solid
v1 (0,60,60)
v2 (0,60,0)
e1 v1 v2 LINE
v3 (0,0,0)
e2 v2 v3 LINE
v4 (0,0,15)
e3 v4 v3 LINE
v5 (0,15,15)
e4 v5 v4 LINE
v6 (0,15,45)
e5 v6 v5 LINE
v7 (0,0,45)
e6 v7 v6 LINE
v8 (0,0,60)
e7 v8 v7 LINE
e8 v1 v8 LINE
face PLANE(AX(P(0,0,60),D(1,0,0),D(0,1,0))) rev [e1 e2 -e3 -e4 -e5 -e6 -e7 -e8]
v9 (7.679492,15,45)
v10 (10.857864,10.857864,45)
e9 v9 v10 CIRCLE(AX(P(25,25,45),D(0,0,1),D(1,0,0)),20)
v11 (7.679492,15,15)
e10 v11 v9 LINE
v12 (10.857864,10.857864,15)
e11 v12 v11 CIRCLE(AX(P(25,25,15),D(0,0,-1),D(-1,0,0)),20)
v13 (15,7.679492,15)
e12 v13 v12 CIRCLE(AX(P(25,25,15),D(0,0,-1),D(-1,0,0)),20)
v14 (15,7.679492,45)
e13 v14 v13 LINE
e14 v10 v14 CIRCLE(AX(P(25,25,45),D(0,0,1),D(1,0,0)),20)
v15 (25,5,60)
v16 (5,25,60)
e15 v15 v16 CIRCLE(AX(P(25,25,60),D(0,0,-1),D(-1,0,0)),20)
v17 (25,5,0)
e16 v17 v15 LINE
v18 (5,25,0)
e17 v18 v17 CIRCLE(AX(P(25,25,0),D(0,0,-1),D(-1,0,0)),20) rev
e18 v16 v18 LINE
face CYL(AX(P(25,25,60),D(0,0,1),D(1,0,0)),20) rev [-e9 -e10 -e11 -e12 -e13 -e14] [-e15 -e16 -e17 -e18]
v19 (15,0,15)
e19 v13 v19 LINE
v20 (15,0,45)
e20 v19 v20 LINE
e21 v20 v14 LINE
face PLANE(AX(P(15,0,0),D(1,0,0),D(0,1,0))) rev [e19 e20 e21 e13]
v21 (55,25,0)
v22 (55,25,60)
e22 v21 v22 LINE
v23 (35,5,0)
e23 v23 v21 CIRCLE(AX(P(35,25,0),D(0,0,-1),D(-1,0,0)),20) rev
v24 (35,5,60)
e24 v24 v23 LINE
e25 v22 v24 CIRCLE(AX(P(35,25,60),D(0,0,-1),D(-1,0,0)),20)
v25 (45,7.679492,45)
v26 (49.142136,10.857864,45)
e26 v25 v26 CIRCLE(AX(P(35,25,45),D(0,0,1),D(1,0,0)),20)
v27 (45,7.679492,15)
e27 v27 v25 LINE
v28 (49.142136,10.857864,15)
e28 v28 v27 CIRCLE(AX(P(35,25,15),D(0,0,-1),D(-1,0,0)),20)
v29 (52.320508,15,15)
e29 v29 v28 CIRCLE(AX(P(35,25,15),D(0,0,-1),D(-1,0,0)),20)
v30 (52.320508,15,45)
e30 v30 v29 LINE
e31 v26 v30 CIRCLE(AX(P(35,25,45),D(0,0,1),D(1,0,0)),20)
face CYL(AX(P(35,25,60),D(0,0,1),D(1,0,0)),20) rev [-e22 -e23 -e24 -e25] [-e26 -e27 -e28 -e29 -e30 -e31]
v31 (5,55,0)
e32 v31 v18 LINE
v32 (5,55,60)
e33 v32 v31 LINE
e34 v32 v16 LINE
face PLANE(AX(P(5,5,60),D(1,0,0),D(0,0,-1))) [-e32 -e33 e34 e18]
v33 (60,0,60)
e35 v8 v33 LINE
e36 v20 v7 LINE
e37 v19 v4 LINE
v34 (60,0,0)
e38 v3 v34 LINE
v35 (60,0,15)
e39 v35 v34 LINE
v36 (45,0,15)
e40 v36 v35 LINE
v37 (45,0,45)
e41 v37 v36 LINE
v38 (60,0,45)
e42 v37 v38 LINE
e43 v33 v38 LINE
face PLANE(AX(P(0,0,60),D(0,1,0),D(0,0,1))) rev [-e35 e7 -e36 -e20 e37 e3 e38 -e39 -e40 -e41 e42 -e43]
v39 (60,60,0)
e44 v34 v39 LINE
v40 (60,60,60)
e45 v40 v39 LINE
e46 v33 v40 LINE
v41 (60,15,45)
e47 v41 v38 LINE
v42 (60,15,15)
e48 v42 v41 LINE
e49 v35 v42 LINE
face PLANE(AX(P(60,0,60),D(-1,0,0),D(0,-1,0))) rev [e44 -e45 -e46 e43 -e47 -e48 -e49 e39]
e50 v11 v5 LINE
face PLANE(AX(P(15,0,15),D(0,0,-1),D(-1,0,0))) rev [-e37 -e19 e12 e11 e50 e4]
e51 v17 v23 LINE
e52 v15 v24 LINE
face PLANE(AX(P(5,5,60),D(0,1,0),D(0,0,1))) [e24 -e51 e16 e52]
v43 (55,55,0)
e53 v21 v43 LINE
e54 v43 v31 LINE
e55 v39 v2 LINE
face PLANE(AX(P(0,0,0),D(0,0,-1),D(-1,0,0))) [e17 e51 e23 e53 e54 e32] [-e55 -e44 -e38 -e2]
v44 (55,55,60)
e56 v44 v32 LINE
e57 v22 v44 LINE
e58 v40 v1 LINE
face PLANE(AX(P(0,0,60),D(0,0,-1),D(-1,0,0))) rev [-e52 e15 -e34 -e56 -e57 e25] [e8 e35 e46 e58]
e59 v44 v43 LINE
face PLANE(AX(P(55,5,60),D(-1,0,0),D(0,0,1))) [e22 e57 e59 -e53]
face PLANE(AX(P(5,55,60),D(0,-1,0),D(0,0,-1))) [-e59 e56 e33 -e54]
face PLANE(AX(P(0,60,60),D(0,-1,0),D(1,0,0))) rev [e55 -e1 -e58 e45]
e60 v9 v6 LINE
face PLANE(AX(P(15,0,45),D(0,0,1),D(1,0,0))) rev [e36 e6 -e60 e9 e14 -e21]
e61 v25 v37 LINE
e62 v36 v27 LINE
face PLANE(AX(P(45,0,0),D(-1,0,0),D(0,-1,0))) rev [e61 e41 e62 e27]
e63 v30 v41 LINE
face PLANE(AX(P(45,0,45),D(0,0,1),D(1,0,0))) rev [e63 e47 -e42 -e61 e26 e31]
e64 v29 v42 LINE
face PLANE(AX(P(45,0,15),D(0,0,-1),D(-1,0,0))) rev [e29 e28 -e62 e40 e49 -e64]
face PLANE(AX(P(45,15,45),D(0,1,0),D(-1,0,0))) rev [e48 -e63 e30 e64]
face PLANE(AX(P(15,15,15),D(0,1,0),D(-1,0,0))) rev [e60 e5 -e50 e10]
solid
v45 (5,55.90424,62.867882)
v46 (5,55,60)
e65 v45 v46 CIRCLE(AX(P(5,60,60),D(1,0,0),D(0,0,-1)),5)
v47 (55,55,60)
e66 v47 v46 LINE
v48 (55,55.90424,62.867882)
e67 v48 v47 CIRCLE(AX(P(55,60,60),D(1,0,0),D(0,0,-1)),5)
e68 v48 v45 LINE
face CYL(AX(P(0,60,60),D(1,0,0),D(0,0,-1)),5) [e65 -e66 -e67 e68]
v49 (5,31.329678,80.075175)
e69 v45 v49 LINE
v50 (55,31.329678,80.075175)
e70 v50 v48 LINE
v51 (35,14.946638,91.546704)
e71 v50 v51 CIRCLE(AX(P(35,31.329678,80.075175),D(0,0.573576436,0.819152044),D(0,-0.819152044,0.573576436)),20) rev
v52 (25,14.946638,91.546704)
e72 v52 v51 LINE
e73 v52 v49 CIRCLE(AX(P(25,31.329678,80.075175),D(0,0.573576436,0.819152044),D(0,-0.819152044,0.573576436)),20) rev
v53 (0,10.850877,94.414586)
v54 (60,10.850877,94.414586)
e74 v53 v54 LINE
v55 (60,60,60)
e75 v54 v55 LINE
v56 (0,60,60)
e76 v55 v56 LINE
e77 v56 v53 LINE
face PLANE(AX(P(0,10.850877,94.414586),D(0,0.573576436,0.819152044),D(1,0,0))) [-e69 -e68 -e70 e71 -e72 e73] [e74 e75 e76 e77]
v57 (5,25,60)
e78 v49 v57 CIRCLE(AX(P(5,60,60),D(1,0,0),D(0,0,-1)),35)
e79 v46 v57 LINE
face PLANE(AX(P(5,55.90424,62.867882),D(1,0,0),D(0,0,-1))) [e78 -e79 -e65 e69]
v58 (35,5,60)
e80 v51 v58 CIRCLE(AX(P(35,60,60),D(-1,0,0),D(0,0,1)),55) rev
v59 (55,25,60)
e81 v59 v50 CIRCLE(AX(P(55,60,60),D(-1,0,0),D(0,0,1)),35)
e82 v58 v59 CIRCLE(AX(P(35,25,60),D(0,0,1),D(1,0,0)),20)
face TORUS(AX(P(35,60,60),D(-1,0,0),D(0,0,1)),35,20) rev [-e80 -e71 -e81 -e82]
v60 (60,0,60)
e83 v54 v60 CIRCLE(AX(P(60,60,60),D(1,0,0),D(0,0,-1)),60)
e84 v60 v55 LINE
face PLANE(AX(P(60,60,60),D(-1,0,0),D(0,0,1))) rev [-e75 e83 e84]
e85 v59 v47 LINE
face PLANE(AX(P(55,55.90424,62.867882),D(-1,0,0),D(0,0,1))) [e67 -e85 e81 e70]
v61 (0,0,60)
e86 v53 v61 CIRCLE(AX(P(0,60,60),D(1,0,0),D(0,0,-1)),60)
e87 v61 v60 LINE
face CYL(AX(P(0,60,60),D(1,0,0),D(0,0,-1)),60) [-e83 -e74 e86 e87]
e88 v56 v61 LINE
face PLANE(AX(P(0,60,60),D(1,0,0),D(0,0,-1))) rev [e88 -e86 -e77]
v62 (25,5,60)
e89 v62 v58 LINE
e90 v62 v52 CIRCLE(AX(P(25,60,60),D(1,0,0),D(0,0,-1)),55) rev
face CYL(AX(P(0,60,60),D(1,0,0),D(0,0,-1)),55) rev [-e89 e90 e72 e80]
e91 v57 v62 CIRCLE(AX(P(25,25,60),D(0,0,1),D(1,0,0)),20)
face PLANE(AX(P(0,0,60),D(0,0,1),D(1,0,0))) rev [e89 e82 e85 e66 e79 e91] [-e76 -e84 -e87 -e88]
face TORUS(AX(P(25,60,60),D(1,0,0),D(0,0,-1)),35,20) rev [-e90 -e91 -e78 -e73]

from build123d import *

# Parameters (mm, degrees)
ESQUISSE1_W             = 60
ESQUISSE1_H             = 60
ESQUISSE1_W_2           = 50
ESQUISSE1_H_2           = 50
BOSS_EXTRU_3_DEPTH      = 60
ESQUISSE10_W            = 60
ESQUISSE10_H            = 60
ESQUISSE10_W_2          = 50
ESQUISSE10_H_2          = 50
R_VOLUTION1_ANGLE       = 35
ESQUISSE11_W            = 30
ESQUISSE11_H            = 15
ENL_V_MAT_EXTRU_3_DEPTH = 15
ESQUISSE12_W            = 30
ESQUISSE12_H            = 15
ENL_V_MAT_EXTRU_4_DEPTH = 15
CONG_1_DEPTH            = 15
CONG_1_START            = 45
CONG_1_2_DEPTH          = 15
CONG_1_START_2          = 15
CONG_1_3_DEPTH          = 30
CONG_3_R                = 20
CONG_4_R                = 20
CONG_5_DEPTH            = 15
CONG_5_START            = 45
CONG_5_2_DEPTH          = 15
CONG_5_START_2          = 15
CONG_5_3_DEPTH          = 30


with BuildPart() as part:
    # Esquisse1 → Boss.-Extru.3 (new body)
    with BuildSketch(Plane.XY):
        with Locations((30, 30)):
            Rectangle(ESQUISSE1_W, ESQUISSE1_H)
        with Locations((30, 30)):
            Rectangle(ESQUISSE1_W_2, ESQUISSE1_H_2, mode=Mode.SUBTRACT)
    extrude(amount=BOSS_EXTRU_3_DEPTH)

    # Esquisse11 → Enlèv. mat.-Extru.3 (cut)
    with BuildSketch(Plane.ZY):
        with Locations((30, 7.5)):
            Rectangle(ESQUISSE11_W, ESQUISSE11_H)
    extrude(amount=-ENL_V_MAT_EXTRU_3_DEPTH, mode=Mode.SUBTRACT)

    # Esquisse12 → Enlèv. mat.-Extru.4 (cut)
    with BuildSketch(Plane(origin=(60, 0, 0), x_dir=(0, 0, -1), z_dir=(1, 0, 0))):
        with Locations((-30, 7.5)):
            Rectangle(ESQUISSE12_W, ESQUISSE12_H)
    extrude(amount=-ENL_V_MAT_EXTRU_4_DEPTH, mode=Mode.SUBTRACT)

    # Congé1: read off the stored shape, not the designer's step
    # Congé1 outline → Congé1 (add)
    with BuildSketch(Plane.XY):
        with BuildLine():
            Line((55, 5), (55, 25))
            ThreePointArc((55, 25), (49.142135624, 10.857864376), (35, 5))
            Line((35, 5), (55, 5))
        make_face()
    extrude(amount=CONG_1_DEPTH)

    # Cong_1 2 outline → Cong_1 2 (add)
    with BuildSketch(Plane.XY.offset(CONG_1_START)):
        with BuildLine():
            Line((55, 5), (55, 25))
            ThreePointArc((55, 25), (49.142135624, 10.857864376), (35, 5))
            Line((35, 5), (55, 5))
        make_face()
    extrude(amount=CONG_1_2_DEPTH)

    # Cong_1 3 outline → Cong_1 3 (add)
    with BuildSketch(Plane.XY.offset(CONG_1_START_2)):
        with BuildLine():
            Line((52.320508076, 15), (55, 15))
            Line((55, 15), (55, 25))
            ThreePointArc((55, 25), (54.318516526, 19.823619098), (52.320508076, 15))
        make_face()
        with BuildLine():
            Line((45, 5), (45, 7.679491924))
            ThreePointArc((45, 7.679491924), (40.176380902, 5.681483474), (35, 5))
            Line((35, 5), (45, 5))
        make_face()
    extrude(amount=CONG_1_3_DEPTH)

    # Congé5: read off the stored shape, not the designer's step
    # Congé5 outline → Congé5 (add)
    with BuildSketch(Plane.XY):
        with BuildLine():
            Line((5, 25), (5, 5))
            Line((5, 5), (25, 5))
            ThreePointArc((25, 5), (10.857864376, 10.857864376), (5, 25))
        make_face()
    extrude(amount=CONG_5_DEPTH)

    # Cong_5 2 outline → Cong_5 2 (add)
    with BuildSketch(Plane.XY.offset(CONG_5_START)):
        with BuildLine():
            Line((5, 25), (5, 5))
            Line((5, 5), (25, 5))
            ThreePointArc((25, 5), (10.857864376, 10.857864376), (5, 25))
        make_face()
    extrude(amount=CONG_5_2_DEPTH)

    # Cong_5 3 outline → Cong_5 3 (add)
    with BuildSketch(Plane.XY.offset(CONG_5_START_2)):
        with BuildLine():
            Line((5, 15), (7.679491924, 15))
            ThreePointArc((7.679491924, 15), (5.681483474, 19.823619098), (5, 25))
            Line((5, 25), (5, 15))
        make_face()
        with BuildLine():
            ThreePointArc((25, 5), (19.823619098, 5.681483474), (15, 7.679491924))
            Line((15, 7.679491924), (15, 5))
            Line((15, 5), (25, 5))
        make_face()
    extrude(amount=CONG_5_3_DEPTH)


with BuildPart() as body_2:
    # Esquisse10 → Révolution1 (revolve)
    with BuildSketch(Plane.XY.offset(60)):
        with Locations((30, 30)):
            Rectangle(ESQUISSE10_W, ESQUISSE10_H)
        with Locations((30, 30)):
            Rectangle(ESQUISSE10_W_2, ESQUISSE10_H_2, mode=Mode.SUBTRACT)
    revolve(axis=Axis((0, 60, 60), (-1, 0, 0)), revolution_arc=R_VOLUTION1_ANGLE)

    # Congé3
    cong_3_edges = [body_2.edges().sort_by_distance(p)[0] for p in [
        (5, 7.545567709, 76.538818973),
    ]]
    fillet(cong_3_edges, radius=CONG_3_R)

    # Congé4
    cong_4_edges = [body_2.edges().sort_by_distance(p)[0] for p in [
        (55, 7.545567709, 76.538818973),
    ]]
    fillet(cong_4_edges, radius=CONG_4_R)


solid = Compound([part.part, body_2.part])
